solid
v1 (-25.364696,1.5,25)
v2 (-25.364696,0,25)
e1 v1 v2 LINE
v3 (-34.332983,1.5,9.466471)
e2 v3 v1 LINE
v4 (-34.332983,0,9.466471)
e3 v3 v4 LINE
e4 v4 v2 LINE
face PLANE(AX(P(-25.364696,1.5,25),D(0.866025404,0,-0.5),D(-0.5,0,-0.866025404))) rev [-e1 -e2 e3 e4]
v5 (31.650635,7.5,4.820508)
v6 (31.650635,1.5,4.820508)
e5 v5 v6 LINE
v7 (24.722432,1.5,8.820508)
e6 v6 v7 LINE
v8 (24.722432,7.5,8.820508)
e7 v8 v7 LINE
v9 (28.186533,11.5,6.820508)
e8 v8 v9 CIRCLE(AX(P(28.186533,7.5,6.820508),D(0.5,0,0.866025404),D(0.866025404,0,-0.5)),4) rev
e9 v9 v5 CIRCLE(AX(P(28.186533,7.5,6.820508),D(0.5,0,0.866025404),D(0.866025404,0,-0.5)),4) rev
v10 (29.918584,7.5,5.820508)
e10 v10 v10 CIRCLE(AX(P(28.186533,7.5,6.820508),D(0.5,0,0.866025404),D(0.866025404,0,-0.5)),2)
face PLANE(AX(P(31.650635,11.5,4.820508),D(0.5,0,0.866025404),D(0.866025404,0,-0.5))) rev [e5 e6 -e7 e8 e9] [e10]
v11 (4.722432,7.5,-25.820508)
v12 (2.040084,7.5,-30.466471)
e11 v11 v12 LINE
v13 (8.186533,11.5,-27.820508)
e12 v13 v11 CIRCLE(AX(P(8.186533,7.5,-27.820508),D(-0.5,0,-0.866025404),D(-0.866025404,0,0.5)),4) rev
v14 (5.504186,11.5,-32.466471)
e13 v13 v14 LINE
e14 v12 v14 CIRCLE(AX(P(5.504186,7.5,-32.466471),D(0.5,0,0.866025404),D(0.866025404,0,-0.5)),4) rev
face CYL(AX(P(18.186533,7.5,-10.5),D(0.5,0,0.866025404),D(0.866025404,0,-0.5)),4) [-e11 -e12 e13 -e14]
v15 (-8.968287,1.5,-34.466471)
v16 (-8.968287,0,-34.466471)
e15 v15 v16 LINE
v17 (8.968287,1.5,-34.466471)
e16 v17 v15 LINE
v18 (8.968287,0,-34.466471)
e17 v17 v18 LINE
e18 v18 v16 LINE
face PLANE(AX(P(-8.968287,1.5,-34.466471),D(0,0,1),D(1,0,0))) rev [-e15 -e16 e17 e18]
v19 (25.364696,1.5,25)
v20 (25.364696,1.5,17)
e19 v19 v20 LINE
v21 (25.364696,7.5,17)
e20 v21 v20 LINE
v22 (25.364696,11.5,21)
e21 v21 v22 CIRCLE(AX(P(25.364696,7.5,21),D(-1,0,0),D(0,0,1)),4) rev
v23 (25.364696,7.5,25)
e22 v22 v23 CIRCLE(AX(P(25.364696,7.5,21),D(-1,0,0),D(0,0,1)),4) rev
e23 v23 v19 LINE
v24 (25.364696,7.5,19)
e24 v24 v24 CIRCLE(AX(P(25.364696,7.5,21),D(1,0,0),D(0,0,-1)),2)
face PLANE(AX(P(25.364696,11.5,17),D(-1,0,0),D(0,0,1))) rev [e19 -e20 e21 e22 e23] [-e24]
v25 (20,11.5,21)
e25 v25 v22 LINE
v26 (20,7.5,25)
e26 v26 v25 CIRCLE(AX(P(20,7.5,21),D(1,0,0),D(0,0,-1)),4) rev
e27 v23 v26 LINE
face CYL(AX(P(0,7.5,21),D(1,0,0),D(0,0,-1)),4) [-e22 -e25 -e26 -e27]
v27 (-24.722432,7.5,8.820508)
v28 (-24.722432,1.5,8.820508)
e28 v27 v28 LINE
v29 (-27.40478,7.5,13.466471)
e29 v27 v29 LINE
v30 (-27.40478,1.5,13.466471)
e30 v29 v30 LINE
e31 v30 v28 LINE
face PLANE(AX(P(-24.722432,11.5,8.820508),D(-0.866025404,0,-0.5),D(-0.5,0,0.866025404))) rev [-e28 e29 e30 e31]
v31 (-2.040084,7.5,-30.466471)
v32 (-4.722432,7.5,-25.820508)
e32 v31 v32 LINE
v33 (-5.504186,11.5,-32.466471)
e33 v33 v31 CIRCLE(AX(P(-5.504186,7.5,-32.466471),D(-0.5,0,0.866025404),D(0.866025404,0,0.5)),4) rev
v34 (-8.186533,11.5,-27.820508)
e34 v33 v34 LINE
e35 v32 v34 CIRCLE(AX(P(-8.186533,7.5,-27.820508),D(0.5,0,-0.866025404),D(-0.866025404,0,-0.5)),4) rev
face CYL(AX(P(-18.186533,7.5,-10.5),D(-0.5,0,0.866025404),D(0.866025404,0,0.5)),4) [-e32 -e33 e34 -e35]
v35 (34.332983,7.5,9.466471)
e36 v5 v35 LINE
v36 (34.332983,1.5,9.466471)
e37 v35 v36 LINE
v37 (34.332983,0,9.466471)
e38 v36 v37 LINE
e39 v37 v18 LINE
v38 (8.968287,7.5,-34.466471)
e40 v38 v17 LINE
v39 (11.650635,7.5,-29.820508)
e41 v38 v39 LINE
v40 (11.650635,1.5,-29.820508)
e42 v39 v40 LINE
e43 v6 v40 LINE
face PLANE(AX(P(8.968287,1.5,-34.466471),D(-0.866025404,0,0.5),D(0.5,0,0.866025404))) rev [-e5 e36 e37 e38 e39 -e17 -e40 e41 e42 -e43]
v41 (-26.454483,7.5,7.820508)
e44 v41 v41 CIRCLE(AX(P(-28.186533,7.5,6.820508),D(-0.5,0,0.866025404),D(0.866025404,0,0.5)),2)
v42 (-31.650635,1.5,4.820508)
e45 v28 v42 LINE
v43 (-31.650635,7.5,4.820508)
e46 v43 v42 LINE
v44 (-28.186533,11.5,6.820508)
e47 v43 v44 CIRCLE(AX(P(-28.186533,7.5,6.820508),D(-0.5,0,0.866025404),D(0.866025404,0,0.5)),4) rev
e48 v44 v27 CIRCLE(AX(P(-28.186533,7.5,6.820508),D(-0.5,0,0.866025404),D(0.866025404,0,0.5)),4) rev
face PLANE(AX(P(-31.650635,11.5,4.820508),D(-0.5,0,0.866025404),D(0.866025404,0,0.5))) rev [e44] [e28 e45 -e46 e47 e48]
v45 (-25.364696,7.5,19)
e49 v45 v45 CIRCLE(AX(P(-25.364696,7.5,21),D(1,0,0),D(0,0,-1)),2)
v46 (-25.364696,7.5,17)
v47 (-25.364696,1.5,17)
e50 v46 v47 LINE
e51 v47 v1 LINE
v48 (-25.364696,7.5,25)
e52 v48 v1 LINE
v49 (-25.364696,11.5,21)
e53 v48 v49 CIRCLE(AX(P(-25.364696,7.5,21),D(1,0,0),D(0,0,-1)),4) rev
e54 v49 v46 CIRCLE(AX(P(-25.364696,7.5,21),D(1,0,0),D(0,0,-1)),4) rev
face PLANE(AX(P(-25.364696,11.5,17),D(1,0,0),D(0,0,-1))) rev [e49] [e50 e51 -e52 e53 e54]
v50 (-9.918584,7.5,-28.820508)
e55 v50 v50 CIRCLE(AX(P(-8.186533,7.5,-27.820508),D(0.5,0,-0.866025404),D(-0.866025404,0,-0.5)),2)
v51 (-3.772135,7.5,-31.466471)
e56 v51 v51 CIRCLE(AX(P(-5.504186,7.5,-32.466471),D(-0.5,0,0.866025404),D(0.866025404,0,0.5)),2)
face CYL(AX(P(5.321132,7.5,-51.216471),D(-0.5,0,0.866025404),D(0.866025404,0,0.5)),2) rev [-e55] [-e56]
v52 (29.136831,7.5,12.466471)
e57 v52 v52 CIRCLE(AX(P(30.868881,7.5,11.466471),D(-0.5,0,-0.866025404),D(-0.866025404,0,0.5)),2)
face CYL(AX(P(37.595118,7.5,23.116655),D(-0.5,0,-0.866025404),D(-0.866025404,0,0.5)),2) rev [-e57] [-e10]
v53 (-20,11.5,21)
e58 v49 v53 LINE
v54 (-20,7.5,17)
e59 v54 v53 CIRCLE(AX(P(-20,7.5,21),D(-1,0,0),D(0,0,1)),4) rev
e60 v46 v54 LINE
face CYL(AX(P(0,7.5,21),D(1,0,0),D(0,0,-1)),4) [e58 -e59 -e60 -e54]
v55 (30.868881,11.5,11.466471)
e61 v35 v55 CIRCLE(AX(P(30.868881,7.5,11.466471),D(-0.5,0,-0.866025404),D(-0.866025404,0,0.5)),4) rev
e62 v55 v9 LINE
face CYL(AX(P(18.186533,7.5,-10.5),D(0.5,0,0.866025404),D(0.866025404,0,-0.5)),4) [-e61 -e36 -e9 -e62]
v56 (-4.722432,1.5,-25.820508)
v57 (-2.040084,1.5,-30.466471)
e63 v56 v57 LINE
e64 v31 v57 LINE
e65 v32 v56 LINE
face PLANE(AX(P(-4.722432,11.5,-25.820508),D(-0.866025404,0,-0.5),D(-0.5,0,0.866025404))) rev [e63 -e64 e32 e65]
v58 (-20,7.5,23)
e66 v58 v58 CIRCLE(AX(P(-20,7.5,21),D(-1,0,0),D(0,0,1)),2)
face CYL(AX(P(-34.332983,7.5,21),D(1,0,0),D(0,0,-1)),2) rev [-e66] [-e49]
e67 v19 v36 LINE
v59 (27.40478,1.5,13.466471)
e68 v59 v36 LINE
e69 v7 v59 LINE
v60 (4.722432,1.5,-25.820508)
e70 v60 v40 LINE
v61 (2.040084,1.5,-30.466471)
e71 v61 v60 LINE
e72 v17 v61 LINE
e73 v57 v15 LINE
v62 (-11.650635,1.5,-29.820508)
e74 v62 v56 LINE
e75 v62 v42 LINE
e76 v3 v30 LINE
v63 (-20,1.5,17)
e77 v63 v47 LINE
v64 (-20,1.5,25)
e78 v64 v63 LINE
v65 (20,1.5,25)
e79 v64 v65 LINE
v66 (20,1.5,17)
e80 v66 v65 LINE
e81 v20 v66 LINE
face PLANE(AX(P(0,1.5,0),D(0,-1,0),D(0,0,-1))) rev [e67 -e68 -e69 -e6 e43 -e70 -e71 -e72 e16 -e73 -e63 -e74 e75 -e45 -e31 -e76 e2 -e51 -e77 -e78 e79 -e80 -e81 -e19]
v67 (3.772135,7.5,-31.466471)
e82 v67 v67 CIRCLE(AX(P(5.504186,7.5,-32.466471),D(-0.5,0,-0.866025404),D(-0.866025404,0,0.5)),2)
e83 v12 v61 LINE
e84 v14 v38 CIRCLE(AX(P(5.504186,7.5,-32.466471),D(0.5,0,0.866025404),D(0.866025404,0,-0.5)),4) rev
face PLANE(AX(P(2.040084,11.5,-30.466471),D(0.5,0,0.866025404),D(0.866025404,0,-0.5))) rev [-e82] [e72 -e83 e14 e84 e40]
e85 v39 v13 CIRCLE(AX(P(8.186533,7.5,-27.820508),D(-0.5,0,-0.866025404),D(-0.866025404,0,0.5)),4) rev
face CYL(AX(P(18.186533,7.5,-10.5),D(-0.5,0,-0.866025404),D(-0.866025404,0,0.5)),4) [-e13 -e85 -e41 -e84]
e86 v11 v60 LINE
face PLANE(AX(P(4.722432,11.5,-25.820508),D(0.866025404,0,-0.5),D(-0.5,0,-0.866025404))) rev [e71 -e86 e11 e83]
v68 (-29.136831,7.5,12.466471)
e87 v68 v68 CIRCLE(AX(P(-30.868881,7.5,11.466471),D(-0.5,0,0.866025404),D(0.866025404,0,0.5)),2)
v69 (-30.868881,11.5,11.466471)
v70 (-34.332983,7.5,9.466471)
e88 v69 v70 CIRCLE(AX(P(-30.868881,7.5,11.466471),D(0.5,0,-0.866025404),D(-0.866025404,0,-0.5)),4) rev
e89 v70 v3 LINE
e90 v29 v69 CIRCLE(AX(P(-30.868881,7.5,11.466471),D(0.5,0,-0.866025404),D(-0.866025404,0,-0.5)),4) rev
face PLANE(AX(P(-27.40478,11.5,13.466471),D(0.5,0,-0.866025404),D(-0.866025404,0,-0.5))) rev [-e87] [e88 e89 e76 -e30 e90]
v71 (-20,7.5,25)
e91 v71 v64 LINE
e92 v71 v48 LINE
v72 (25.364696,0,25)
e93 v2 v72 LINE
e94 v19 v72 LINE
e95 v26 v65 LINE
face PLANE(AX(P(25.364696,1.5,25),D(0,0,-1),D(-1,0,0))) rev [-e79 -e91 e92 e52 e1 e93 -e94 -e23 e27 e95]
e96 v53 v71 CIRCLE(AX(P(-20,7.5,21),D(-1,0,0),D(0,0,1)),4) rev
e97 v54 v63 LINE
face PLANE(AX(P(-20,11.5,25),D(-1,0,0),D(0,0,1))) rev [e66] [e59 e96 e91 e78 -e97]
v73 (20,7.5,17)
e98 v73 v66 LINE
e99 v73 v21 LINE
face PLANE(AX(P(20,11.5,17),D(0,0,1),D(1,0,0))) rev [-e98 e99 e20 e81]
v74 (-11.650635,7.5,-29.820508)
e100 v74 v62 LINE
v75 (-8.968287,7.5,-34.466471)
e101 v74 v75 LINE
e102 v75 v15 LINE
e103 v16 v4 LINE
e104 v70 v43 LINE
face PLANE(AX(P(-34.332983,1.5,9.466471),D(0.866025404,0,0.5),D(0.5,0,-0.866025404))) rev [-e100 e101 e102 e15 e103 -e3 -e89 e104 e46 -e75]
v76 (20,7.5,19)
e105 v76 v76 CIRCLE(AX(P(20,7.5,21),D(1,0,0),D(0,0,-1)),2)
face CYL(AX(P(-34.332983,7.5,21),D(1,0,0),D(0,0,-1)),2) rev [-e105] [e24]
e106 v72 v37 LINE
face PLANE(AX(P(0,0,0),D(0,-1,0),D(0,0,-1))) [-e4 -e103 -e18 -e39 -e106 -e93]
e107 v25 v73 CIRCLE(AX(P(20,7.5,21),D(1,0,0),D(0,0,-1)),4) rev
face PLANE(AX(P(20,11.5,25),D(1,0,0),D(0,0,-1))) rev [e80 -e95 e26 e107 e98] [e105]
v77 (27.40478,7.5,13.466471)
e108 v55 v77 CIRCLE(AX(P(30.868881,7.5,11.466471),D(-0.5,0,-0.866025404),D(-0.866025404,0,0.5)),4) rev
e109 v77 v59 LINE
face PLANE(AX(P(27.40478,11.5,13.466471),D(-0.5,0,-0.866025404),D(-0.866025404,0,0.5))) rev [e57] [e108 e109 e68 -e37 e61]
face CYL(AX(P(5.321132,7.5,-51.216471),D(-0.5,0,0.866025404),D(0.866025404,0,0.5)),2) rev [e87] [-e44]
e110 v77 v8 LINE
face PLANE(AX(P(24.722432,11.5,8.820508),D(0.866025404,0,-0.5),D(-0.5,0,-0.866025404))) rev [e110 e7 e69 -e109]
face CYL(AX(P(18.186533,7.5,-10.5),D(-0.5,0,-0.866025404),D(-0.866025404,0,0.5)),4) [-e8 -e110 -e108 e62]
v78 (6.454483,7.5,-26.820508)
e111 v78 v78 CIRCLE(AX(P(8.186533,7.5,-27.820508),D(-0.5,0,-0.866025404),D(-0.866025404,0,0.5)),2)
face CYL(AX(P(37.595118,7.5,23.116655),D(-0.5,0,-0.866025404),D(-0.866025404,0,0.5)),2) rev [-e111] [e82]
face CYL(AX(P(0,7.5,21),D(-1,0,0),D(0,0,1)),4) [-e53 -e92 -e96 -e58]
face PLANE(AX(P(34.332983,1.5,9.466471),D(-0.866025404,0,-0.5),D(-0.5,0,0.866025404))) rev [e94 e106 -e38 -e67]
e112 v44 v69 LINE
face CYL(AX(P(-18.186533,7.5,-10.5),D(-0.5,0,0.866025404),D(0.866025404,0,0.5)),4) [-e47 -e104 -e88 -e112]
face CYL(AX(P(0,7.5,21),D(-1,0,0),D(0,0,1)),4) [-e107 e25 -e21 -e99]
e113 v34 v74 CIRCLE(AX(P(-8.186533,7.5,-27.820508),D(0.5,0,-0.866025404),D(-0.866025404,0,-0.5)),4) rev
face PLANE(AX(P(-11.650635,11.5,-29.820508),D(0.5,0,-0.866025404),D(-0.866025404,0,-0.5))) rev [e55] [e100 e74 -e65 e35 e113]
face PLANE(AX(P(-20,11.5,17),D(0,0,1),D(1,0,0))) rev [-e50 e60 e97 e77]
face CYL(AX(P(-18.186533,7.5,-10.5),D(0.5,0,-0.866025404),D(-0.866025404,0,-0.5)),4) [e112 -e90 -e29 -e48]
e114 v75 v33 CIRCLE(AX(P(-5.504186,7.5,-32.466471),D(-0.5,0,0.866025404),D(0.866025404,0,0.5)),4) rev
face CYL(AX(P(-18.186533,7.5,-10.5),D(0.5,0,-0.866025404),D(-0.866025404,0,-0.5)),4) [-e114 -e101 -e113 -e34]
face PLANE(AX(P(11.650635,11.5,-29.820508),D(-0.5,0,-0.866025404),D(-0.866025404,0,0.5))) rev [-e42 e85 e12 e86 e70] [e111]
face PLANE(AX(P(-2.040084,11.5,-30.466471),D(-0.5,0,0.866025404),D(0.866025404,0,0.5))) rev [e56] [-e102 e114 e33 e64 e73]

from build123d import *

# Parameters (mm, degrees)
BOSS_EXTRUDE2_DEPTH      = 1.5
SKETCH4_W                = 5.364695745
SKETCH4_H                = 8
BOSS_EXTRUDE3_DEPTH      = 10
SKETCH5_R                = 2
CUT_EXTRUDE2_DEPTH       = 70.885624116
FILLET1_R                = 4
CIRPATTERN1_COUNT        = 3
FILLET1_OF_CIRPATTERN1_R = 4


with BuildPart() as part:
    # Sketch3 → Boss-Extrude2 (new body)
    with BuildSketch(Plane(origin=(0, 0, 0), x_dir=(1, 0, 0), z_dir=(0, 1, 0))):
        Polygon((-8.968287222, 34.466470874), (8.968287222, 34.466470874), (34.332982967, -9.466470874), (25.364695745, -25), (-25.364695745, -25), (-34.332982967, -9.466470874), align=None)
    extrude(amount=BOSS_EXTRUDE2_DEPTH)

    # Sketch4 → Boss-Extrude3 (add)
    with BuildSketch(Plane(origin=(0, 1.5, 0), x_dir=(1, 0, 0), z_dir=(0, 1, 0))):
        with Locations((-22.682347873, -21)):
            Rectangle(SKETCH4_W, SKETCH4_H)
        with Locations((22.682347873, -21)):
            Rectangle(SKETCH4_W, SKETCH4_H)
    boss_extrude3 = extrude(amount=BOSS_EXTRUDE3_DEPTH)

    # Sketch5 → Cut-Extrude2 (cut, through all)
    with BuildSketch(Plane(origin=(25.364695745, 0, 0), x_dir=(0, 0, -1), z_dir=(1, 0, 0))):
        with Locations((-21, 7.5)):
            Circle(SKETCH5_R)
    cut_extrude2 = extrude(amount=-CUT_EXTRUDE2_DEPTH, mode=Mode.SUBTRACT)

    # Fillet1
    fillet1_edges = [part.edges().sort_by_distance(p)[0] for p in [
        (-22.682347872, 11.5, 17),
        (-22.682347872, 11.5, 25),
        (22.682347872, 11.5, 17),
        (22.682347872, 11.5, 25),
    ]]
    fillet(fillet1_edges, radius=FILLET1_R - 0.0001)  # a hair under: the kernel refuses the full size

    # CirPattern1: Boss-Extrude3, Cut-Extrude2 ×3 about axis
    cirpattern1_axis = Axis((0, 0, 0), (0, 1, 0))
    add([boss_extrude3.rotate(cirpattern1_axis, i * 360 / CIRPATTERN1_COUNT) for i in range(1, CIRPATTERN1_COUNT)])
    add([cut_extrude2.rotate(cirpattern1_axis, i * 360 / CIRPATTERN1_COUNT) for i in range(1, CIRPATTERN1_COUNT)], mode=Mode.SUBTRACT)

    # Fillet1 of CirPattern1
    fillet1_of_cirpattern1_edges = [part.edges().sort_by_distance(p)[0] for p in [
        (26.063605801, 11.5, 11.143489475),
        (32.991809031, 11.5, 7.143489475),
        (3.381257928, 11.5, -28.143489475),
        (10.309461158, 11.5, -32.143489475),
        (-3.381257928, 11.5, -28.143489475),
        (-10.309461158, 11.5, -32.143489475),
        (-26.063605801, 11.5, 11.143489475),
        (-32.991809031, 11.5, 7.143489475),
    ]]
    fillet(fillet1_of_cirpattern1_edges, radius=FILLET1_OF_CIRPATTERN1_R - 0.0001)  # a hair under: the kernel refuses the full size


solid = part.part
